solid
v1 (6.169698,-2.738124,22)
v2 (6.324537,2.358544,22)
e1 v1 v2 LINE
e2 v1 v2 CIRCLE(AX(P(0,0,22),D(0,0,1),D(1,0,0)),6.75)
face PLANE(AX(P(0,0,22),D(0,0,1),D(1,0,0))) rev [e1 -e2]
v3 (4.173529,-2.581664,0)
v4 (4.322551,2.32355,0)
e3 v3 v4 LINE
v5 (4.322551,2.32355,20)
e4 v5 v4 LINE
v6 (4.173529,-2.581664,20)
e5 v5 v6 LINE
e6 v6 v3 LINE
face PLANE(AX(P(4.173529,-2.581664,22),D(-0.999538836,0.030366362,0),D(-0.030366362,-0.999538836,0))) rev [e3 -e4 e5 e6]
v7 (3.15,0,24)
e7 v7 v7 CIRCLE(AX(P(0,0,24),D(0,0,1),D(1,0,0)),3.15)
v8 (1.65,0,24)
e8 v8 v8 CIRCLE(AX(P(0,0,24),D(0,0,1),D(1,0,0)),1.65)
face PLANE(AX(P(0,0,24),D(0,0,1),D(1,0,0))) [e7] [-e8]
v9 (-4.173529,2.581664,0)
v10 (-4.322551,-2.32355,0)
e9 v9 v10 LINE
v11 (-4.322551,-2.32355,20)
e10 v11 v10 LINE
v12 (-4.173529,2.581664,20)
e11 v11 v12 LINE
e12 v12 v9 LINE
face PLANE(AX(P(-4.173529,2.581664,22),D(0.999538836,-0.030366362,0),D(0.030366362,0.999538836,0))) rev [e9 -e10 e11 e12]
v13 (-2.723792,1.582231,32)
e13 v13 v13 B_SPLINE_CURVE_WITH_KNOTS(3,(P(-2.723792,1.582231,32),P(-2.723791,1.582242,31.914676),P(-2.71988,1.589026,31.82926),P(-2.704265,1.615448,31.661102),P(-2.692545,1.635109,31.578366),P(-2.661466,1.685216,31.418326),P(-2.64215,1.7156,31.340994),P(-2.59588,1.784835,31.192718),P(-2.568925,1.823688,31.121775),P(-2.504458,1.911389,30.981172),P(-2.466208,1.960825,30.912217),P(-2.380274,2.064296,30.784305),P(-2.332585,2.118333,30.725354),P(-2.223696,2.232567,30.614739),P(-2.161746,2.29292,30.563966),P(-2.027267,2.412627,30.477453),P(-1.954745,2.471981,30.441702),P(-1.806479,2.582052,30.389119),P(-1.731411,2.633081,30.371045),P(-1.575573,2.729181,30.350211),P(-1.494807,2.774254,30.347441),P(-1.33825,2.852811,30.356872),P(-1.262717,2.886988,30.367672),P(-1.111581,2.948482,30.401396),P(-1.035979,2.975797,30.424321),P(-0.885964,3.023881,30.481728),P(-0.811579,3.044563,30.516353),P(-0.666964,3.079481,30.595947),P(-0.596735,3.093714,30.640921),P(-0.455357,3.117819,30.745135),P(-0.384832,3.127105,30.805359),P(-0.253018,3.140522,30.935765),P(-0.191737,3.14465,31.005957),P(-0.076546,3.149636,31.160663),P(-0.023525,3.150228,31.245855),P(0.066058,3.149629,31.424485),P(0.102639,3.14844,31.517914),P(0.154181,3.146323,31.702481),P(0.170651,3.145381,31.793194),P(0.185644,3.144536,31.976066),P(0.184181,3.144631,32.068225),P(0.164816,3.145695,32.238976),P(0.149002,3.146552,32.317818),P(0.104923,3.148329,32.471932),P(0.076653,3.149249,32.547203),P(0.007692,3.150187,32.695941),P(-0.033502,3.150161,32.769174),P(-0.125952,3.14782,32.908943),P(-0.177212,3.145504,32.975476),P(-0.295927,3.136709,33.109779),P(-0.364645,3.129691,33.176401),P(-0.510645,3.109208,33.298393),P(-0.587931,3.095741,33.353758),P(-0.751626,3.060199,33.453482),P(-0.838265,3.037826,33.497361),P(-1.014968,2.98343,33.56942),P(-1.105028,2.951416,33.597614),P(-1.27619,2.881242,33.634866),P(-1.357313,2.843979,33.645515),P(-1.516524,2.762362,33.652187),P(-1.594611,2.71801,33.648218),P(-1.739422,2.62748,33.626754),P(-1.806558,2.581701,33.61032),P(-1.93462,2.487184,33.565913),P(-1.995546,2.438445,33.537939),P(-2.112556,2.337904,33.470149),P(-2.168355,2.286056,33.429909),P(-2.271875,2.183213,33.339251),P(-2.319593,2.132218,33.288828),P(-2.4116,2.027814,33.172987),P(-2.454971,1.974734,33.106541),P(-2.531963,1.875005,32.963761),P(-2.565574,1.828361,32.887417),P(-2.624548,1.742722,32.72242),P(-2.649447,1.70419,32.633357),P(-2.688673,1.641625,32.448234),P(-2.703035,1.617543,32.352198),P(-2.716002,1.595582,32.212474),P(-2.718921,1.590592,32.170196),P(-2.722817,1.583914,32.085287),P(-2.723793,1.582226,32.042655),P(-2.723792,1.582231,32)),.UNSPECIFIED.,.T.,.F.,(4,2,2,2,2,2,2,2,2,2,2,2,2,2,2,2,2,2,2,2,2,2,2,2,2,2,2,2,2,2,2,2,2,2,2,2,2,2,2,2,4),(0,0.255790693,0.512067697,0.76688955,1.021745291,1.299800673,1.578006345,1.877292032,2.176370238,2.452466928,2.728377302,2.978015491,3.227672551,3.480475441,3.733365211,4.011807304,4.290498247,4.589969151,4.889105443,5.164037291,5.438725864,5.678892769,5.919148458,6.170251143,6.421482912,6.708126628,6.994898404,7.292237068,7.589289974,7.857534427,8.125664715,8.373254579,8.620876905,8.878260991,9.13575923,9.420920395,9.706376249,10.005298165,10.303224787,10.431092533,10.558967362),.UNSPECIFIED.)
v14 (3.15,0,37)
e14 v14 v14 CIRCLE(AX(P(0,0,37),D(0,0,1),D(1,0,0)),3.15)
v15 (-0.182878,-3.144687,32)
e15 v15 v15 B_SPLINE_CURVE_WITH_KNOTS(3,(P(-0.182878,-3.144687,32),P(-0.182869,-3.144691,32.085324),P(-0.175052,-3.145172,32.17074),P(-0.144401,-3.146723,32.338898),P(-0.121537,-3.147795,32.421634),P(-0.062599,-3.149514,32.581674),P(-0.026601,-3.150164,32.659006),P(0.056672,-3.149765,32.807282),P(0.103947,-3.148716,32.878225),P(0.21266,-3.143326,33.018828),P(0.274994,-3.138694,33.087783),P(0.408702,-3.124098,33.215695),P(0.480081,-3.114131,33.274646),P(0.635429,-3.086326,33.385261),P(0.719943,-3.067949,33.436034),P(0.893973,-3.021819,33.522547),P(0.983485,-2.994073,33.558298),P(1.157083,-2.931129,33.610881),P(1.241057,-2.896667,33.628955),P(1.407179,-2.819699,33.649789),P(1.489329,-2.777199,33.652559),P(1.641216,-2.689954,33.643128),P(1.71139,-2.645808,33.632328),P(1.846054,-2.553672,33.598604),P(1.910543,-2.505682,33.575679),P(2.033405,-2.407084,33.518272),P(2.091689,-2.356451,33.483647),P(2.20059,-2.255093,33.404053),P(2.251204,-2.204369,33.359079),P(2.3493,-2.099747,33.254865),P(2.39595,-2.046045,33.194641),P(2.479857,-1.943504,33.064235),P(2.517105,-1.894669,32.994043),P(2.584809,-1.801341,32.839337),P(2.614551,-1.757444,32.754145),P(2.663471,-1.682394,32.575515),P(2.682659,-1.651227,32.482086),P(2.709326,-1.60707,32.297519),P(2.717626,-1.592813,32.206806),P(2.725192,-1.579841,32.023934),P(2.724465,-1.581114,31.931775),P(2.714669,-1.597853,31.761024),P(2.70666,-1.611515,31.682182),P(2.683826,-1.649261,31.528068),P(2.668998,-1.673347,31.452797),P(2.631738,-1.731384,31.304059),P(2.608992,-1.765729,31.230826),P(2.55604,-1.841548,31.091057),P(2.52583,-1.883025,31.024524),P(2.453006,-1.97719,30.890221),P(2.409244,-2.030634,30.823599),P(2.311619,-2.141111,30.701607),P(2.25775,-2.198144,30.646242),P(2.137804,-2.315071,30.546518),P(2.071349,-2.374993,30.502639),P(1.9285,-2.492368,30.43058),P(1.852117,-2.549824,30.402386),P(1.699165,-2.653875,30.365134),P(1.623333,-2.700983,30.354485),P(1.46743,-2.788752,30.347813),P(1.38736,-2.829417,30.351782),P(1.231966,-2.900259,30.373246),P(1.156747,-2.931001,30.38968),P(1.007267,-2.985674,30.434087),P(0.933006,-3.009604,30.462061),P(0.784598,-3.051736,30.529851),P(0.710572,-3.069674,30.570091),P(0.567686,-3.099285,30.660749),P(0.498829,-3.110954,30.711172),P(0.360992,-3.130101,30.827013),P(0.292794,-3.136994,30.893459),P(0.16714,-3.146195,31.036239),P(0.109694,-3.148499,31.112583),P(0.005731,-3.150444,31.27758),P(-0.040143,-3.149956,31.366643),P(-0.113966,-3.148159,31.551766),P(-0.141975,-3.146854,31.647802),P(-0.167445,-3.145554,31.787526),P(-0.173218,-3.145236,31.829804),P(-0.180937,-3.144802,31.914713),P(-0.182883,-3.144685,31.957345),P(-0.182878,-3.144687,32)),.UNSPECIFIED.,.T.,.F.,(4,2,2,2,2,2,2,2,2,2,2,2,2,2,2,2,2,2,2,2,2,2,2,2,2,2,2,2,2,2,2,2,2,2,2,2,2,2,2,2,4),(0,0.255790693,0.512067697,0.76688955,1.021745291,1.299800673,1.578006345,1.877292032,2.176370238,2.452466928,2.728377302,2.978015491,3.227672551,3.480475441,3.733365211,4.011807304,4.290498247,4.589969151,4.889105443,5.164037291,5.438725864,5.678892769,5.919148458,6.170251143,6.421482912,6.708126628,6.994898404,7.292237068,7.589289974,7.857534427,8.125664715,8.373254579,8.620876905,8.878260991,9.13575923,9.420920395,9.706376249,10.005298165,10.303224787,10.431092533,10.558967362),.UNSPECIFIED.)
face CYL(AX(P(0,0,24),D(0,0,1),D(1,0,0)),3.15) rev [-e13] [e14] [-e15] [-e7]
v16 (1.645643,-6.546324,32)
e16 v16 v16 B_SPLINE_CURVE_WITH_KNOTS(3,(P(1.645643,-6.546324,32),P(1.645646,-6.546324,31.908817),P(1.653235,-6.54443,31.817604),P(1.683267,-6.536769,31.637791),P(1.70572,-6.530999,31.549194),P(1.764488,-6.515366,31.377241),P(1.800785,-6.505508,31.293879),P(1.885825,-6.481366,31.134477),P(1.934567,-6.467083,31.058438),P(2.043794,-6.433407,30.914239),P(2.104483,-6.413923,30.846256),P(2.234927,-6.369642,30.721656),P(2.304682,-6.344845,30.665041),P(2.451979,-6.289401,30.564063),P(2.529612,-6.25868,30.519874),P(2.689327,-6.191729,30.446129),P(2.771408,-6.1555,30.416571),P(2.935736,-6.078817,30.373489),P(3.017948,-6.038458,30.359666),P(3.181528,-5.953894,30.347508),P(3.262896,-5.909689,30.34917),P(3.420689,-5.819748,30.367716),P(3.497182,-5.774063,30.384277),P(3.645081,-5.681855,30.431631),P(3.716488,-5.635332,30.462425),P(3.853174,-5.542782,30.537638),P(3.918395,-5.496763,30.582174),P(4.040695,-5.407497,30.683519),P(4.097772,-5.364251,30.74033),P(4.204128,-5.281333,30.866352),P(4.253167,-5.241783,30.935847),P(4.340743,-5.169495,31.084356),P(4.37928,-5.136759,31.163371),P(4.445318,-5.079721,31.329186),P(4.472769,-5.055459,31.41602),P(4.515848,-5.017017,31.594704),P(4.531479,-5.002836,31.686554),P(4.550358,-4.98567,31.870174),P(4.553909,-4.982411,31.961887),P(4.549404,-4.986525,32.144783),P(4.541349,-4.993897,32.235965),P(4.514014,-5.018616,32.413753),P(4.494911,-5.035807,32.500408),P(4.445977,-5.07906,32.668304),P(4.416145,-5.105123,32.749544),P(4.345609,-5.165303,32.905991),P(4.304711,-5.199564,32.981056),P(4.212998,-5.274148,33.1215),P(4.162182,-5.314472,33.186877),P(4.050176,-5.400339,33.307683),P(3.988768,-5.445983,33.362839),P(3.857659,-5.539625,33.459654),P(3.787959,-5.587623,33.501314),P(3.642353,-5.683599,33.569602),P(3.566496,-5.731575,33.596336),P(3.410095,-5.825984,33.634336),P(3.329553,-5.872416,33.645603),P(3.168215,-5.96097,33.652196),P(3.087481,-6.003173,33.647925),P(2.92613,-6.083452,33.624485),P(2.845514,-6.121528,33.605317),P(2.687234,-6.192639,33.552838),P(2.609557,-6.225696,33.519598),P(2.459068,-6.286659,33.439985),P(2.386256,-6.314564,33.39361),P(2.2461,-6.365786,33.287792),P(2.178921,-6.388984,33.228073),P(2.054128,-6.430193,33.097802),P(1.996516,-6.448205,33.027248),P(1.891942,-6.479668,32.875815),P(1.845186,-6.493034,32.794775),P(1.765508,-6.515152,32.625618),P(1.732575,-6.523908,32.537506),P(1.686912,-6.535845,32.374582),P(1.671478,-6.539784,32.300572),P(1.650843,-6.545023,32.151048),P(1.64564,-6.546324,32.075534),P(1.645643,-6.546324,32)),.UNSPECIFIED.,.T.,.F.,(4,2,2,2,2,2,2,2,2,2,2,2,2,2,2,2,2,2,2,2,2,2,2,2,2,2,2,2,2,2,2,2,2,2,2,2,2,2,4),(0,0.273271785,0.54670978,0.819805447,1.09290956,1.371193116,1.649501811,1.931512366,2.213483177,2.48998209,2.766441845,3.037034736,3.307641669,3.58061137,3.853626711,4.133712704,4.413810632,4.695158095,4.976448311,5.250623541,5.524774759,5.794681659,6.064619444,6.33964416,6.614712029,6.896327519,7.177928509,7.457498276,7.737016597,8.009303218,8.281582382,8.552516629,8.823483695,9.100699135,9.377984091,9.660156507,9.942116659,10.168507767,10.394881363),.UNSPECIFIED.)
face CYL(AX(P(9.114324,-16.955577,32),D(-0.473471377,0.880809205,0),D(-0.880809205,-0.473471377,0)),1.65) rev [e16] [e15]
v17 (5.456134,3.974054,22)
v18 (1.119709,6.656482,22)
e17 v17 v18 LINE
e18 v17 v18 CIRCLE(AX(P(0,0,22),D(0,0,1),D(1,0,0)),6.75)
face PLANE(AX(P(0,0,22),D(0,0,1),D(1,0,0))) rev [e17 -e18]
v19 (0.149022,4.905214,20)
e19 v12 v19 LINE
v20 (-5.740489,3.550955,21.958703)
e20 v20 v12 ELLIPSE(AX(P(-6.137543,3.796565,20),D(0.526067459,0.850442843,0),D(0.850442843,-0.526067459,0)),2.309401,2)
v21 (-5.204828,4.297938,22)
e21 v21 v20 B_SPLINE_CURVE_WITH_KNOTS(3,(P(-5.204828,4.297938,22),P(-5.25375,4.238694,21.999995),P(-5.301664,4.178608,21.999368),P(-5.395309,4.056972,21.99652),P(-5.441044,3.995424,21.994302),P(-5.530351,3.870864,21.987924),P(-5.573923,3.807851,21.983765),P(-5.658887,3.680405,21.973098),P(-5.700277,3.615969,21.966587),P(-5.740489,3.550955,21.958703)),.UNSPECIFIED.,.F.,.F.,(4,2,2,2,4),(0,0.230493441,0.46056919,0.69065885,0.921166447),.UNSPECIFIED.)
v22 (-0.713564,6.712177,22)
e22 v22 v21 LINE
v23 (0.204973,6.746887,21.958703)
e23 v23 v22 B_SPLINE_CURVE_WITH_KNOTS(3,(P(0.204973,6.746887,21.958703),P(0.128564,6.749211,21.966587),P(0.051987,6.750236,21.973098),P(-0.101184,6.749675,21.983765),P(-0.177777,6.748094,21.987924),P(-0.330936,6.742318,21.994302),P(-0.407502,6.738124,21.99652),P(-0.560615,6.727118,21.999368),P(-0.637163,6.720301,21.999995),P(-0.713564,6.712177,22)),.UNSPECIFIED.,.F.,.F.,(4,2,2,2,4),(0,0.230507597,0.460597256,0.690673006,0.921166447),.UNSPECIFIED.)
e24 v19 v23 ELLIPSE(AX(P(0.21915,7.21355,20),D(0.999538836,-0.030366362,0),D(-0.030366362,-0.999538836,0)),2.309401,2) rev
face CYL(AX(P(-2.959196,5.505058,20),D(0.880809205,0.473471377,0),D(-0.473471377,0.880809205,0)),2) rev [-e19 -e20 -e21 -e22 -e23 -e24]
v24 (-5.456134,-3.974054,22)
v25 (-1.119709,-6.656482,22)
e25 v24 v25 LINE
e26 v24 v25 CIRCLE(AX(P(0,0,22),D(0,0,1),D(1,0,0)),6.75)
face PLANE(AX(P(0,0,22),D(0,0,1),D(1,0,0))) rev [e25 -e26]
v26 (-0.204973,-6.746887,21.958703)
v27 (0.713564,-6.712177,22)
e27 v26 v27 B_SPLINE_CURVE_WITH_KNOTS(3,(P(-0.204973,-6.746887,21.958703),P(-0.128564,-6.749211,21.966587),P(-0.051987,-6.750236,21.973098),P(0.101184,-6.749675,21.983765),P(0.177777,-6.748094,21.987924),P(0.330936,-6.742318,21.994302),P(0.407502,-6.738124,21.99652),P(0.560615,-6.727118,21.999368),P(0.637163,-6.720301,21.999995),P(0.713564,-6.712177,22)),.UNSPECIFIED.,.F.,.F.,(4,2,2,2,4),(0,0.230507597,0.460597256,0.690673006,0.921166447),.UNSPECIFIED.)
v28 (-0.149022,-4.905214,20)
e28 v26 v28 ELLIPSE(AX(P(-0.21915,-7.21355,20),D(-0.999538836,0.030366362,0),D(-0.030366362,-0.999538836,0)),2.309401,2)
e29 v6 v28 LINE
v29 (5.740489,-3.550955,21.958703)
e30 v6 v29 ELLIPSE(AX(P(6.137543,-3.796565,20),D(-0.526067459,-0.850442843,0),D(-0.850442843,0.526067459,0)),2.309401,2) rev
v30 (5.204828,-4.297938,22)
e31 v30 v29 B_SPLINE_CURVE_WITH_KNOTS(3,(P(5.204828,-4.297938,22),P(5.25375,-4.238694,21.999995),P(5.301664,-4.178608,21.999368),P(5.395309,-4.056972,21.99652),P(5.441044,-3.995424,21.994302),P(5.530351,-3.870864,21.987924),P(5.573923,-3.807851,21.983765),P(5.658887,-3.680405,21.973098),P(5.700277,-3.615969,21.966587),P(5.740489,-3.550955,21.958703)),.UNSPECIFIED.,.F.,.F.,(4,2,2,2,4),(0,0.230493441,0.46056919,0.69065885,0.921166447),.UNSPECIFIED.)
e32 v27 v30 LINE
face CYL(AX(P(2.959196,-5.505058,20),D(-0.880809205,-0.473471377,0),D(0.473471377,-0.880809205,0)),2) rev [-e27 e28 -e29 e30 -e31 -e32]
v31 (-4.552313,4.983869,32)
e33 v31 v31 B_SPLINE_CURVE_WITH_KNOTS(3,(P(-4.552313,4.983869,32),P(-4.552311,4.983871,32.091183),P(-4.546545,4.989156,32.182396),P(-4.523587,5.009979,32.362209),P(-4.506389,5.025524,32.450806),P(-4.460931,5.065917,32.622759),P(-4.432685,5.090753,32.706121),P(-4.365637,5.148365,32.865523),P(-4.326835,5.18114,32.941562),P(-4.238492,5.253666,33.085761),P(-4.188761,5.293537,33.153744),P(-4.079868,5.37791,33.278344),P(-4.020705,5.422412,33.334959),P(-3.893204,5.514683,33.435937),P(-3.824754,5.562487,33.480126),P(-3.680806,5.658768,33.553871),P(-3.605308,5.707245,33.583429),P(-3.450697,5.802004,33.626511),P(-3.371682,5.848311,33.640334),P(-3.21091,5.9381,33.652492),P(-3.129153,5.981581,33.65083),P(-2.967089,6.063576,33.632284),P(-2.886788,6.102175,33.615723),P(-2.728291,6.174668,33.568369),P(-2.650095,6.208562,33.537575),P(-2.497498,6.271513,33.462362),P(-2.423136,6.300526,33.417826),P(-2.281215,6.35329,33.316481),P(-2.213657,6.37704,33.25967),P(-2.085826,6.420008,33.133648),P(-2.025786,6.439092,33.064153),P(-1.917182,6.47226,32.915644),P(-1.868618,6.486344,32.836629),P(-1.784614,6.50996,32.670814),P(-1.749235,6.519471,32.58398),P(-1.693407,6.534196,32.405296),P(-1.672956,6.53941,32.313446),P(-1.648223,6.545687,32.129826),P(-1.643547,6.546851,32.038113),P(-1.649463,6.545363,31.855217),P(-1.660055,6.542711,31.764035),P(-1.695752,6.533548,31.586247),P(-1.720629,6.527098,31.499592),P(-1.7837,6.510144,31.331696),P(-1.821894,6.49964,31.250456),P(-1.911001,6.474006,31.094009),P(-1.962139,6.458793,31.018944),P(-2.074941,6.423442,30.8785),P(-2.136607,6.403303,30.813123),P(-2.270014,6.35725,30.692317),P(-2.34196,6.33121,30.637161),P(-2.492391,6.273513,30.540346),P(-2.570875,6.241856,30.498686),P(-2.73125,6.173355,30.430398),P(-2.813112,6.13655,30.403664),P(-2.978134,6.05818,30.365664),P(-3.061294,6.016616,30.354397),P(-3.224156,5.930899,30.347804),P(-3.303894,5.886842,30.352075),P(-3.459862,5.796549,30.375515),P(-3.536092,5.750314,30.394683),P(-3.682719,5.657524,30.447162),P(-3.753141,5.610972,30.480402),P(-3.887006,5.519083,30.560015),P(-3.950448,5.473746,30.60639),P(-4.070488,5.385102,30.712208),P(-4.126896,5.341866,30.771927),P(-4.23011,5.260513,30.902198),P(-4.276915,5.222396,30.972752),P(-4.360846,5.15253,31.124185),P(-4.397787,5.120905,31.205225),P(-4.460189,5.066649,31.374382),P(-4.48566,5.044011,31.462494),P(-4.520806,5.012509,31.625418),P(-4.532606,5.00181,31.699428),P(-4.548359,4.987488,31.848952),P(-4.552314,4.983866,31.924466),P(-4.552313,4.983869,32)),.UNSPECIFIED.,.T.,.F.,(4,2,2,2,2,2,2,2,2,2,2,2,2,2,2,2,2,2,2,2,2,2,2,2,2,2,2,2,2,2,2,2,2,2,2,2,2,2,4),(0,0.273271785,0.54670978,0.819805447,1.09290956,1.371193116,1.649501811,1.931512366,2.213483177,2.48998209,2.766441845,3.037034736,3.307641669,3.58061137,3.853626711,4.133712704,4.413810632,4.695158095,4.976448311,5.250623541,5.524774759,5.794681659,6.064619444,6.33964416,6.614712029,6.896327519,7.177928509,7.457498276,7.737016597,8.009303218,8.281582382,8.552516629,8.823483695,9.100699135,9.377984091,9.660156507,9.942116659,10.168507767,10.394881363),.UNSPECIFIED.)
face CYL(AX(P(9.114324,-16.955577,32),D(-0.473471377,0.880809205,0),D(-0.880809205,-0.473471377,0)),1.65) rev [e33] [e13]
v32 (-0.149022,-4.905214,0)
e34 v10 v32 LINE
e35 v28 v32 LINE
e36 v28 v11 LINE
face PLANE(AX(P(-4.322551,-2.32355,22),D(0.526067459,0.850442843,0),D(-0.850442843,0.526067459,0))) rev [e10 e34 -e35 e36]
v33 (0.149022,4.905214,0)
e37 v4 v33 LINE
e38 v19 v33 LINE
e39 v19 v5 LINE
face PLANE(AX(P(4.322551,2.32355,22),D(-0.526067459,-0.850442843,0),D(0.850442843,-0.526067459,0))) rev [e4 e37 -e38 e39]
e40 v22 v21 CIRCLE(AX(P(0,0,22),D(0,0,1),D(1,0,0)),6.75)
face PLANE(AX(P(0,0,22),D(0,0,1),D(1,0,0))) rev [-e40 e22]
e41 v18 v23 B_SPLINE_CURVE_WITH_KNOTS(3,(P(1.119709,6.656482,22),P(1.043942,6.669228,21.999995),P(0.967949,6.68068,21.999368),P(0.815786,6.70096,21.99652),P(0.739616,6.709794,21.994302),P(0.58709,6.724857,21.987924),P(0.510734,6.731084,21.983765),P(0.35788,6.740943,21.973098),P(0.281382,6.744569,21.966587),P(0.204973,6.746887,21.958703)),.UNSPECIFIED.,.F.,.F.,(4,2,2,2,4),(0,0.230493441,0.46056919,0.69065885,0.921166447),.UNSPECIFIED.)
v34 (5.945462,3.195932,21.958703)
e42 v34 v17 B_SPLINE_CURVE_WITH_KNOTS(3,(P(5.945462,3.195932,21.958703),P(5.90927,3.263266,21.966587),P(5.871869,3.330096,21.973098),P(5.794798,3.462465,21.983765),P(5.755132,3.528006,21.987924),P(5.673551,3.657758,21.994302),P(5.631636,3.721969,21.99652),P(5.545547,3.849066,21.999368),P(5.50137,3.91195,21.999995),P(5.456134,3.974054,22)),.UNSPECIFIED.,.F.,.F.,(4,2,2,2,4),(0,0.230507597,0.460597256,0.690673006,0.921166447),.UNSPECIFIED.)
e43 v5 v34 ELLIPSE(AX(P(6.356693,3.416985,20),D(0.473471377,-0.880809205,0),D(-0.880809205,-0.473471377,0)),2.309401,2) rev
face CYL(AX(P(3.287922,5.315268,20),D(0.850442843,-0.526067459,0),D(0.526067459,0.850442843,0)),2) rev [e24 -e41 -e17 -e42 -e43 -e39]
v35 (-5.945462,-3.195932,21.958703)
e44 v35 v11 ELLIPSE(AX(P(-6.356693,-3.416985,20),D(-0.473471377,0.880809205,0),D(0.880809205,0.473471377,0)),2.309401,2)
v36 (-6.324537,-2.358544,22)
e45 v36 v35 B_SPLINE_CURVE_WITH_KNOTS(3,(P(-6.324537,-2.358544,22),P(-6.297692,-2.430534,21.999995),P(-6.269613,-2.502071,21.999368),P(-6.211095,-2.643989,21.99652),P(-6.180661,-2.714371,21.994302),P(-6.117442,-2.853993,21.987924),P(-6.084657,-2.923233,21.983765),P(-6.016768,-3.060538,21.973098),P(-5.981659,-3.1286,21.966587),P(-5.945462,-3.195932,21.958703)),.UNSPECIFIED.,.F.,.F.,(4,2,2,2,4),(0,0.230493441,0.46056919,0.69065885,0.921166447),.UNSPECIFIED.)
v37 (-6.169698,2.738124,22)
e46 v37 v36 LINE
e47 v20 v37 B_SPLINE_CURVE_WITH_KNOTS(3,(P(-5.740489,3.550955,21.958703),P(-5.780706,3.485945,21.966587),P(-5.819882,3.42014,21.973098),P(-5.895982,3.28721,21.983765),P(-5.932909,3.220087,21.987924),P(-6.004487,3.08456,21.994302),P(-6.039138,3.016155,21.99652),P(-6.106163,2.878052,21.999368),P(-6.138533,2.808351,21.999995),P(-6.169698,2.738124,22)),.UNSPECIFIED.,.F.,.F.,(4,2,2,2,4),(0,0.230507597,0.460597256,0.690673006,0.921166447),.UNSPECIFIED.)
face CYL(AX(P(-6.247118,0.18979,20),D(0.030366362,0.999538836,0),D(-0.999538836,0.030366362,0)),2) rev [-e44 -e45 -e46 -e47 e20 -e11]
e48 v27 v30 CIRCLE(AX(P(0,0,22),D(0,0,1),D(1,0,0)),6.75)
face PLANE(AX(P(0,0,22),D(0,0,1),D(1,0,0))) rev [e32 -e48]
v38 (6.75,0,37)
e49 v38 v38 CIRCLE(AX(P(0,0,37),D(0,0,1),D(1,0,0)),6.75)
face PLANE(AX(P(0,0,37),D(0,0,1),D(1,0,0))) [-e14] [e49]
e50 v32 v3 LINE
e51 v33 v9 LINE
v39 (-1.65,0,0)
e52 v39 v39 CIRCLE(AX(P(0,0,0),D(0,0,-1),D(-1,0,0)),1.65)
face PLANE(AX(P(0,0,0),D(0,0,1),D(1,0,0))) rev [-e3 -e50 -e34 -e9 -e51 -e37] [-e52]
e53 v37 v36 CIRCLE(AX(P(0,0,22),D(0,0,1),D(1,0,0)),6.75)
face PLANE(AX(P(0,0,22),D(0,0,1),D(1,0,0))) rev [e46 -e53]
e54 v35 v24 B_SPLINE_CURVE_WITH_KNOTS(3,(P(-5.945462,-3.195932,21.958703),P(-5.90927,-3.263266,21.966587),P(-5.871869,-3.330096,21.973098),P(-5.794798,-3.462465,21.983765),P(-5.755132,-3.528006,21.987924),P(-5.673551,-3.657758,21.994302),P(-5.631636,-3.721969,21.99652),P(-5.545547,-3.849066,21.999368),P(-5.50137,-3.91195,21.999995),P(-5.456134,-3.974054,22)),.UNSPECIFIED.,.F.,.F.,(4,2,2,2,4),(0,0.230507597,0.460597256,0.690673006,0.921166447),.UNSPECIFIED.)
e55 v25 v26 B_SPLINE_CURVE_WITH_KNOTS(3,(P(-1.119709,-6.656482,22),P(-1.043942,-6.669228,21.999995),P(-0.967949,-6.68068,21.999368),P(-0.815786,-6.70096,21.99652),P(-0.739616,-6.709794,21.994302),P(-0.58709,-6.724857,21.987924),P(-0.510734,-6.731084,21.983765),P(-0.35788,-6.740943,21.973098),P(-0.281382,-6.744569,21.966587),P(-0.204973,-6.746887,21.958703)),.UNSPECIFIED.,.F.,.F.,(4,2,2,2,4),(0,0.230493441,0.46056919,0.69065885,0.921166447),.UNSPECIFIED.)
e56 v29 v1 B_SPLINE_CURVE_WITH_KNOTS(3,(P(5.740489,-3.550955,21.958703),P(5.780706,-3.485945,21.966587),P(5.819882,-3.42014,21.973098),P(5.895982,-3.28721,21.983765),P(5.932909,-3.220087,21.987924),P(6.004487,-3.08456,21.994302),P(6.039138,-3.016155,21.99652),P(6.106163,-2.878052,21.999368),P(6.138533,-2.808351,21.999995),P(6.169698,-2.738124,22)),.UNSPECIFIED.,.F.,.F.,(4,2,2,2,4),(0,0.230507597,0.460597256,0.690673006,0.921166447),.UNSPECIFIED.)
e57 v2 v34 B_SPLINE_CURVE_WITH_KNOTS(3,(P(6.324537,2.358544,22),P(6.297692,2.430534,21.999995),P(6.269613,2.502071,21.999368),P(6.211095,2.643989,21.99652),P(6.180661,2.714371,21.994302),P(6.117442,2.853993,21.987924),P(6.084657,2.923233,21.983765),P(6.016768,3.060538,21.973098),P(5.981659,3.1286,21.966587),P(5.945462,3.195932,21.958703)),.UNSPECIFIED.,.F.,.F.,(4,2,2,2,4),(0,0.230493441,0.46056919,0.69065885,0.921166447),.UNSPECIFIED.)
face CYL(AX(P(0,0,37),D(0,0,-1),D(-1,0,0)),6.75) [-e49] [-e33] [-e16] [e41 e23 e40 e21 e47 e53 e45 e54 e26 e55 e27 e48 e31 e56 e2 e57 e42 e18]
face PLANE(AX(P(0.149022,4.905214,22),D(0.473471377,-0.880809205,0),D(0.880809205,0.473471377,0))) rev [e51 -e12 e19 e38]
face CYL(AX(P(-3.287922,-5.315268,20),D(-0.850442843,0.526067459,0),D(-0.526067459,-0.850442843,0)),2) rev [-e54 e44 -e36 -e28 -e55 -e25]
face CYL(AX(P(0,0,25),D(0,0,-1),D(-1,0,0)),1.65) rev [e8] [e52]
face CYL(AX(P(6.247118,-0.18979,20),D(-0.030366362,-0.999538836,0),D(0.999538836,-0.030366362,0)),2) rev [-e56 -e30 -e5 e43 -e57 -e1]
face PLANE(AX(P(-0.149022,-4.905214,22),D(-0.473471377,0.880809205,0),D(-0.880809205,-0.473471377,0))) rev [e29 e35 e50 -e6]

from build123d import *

# Parameters (mm, degrees)
BOSS_EXTRUDE1_DEPTH     = 22
SKETCH2_R               = 6.75
BOSS_EXTRUDE2_DEPTH     = 15
SKETCH3_R               = 3.15
CUT_EXTRUDE1_DEPTH      = 13
FILLET2_R               = 2
CUT_EXTRUDE2_DEPTH      = 15
CUT_EXTRUDE2_DEPTH_BACK = 15
SKETCH8_R               = 1.65
SKETCH9_R               = 1.65
CUT_EXTRUDE3_DEPTH      = 25


with BuildPart() as part:
    # Sketch1 → Boss-Extrude1 (new body)
    with BuildSketch(Plane.XY):
        Polygon((4.322551167, 2.323550029), (0.149022231, 4.905214135), (-4.173528936, 2.581664105), (-4.322551167, -2.323550029), (-0.149022231, -4.905214135), (4.173528936, -2.581664105), align=None)
    extrude(amount=BOSS_EXTRUDE1_DEPTH)

    # Sketch2 → Boss-Extrude2 (add)
    with BuildSketch(Plane.XY.offset(22)):
        Circle(SKETCH2_R)
    extrude(amount=BOSS_EXTRUDE2_DEPTH)

    # Sketch3 → Cut-Extrude1 (cut)
    with BuildSketch(Plane.XY.offset(37)):
        Circle(SKETCH3_R)
    extrude(amount=-CUT_EXTRUDE1_DEPTH, mode=Mode.SUBTRACT)

    # Fillet2
    # the kernel refuses this fillet: 2 mm, written as the material it adds along each edge
    with BuildSketch(Plane(origin=(-4.021697127, 7.579358284, 22), x_dir=(-0.9995388356967246, 0.03036636188344198, 0), z_dir=(-0.03036636188344198, -0.9995388356967246, 0))) as fillet2_piece_1_section:
        with BuildLine():
            CenterArc((FILLET2_R, FILLET2_R), FILLET2_R, 180, 90)
            Line((0, FILLET2_R), (0, 0))
            Line((0, 0), (FILLET2_R, 0))
        make_face()
    fillet2_piece_1 = extrude(amount=14.907477288, mode=Mode.PRIVATE)
    fillet2_piece_1 = split(fillet2_piece_1, bisect_by=Plane(origin=(-5.562210671, 1.835190238, 21.518286734), z_dir=(0.47347137703679, -0.8808092047242047, 0)), keep=Keep.TOP, mode=Mode.PRIVATE)
    fillet2_piece_1 = split(fillet2_piece_1, bisect_by=Plane(origin=(-5.663357367, -1.494153303, 21.518286734), z_dir=(0.5260674586599345, 0.8504428428407627, 0)), keep=Keep.TOP, mode=Mode.PRIVATE)
    add(fillet2_piece_1)
    with BuildSketch(Plane(origin=(-8.574765382, 0.306787264, 22), x_dir=(-0.5260674586599345, -0.8504428428407627, 0), z_dir=(0.8504428428407627, -0.5260674586599345, 0))) as fillet2_piece_2_section:
        with BuildLine():
            CenterArc((FILLET2_R, FILLET2_R), FILLET2_R, 180, 90)
            Line((0, FILLET2_R), (0, 0))
            Line((0, 0), (FILLET2_R, 0))
        make_face()
    fillet2_piece_2 = extrude(amount=14.907477288, mode=Mode.PRIVATE)
    fillet2_piece_2 = split(fillet2_piece_2, bisect_by=Plane(origin=(-4.370426703, -3.899420623, 21.518286734), z_dir=(0.9995388356967246, -0.03036636188344198, 0)), keep=Keep.TOP, mode=Mode.PRIVATE)
    fillet2_piece_2 = split(fillet2_piece_2, bisect_by=Plane(origin=(-1.537703966, -5.651688002, 21.518286734), z_dir=(-0.47347137703679004, 0.8808092047242047, 0)), keep=Keep.TOP, mode=Mode.PRIVATE)
    add(fillet2_piece_2)
    with BuildSketch(Plane(origin=(-4.553068255, -7.27257102, 22), x_dir=(0.4734713770367901, -0.8808092047242048, 0), z_dir=(0.8808092047242047, 0.47347137703679004, 0))) as fillet2_piece_3_section:
        with BuildLine():
            CenterArc((FILLET2_R, FILLET2_R), FILLET2_R, 180, 90)
            Line((0, FILLET2_R), (0, 0))
            Line((0, 0), (FILLET2_R, 0))
        make_face()
    fillet2_piece_3 = extrude(amount=14.907477288, mode=Mode.PRIVATE)
    fillet2_piece_3 = split(fillet2_piece_3, bisect_by=Plane(origin=(1.191783968, -5.734610861, 21.518286734), z_dir=(0.5260674586599345, 0.8504428428407627, 0)), keep=Keep.TOP, mode=Mode.PRIVATE)
    fillet2_piece_3 = split(fillet2_piece_3, bisect_by=Plane(origin=(4.125653401, -4.157534699, 21.518286734), z_dir=(-0.9995388356967246, 0.03036636188344197, 0)), keep=Keep.TOP, mode=Mode.PRIVATE)
    add(fillet2_piece_3)
    with BuildSketch(Plane(origin=(4.021697127, -7.579358284, 22), x_dir=(0.9995388356967246, -0.03036636188344197, 0), z_dir=(0.03036636188344197, 0.9995388356967246, 0))) as fillet2_piece_4_section:
        with BuildLine():
            CenterArc((FILLET2_R, FILLET2_R), FILLET2_R, 180, 90)
            Line((0, FILLET2_R), (0, 0))
            Line((0, 0), (FILLET2_R, 0))
        make_face()
    fillet2_piece_4 = extrude(amount=14.907477288, mode=Mode.PRIVATE)
    fillet2_piece_4 = split(fillet2_piece_4, bisect_by=Plane(origin=(5.663357367, 1.494153303, 21.518286734), z_dir=(-0.5260674586599344, -0.8504428428407627, 0)), keep=Keep.TOP, mode=Mode.PRIVATE)
    fillet2_piece_4 = split(fillet2_piece_4, bisect_by=Plane(origin=(5.562210671, -1.835190238, 21.518286734), z_dir=(-0.47347137703679004, 0.8808092047242047, 0)), keep=Keep.TOP, mode=Mode.PRIVATE)
    add(fillet2_piece_4)
    with BuildSketch(Plane(origin=(8.574765382, -0.306787264, 22), x_dir=(0.5260674586599344, 0.8504428428407628, 0), z_dir=(-0.8504428428407627, 0.5260674586599344, 0))) as fillet2_piece_5_section:
        with BuildLine():
            CenterArc((FILLET2_R, FILLET2_R), FILLET2_R, 180, 90)
            Line((0, FILLET2_R), (0, 0))
            Line((0, 0), (FILLET2_R, 0))
        make_face()
    fillet2_piece_5 = extrude(amount=14.907477288, mode=Mode.PRIVATE)
    fillet2_piece_5 = split(fillet2_piece_5, bisect_by=Plane(origin=(4.370426703, 3.899420623, 21.518286734), z_dir=(-0.9995388356967246, 0.03036636188344197, 0)), keep=Keep.TOP, mode=Mode.PRIVATE)
    fillet2_piece_5 = split(fillet2_piece_5, bisect_by=Plane(origin=(1.537703966, 5.651688002, 21.518286734), z_dir=(0.47347137703679, -0.8808092047242047, 0)), keep=Keep.TOP, mode=Mode.PRIVATE)
    add(fillet2_piece_5)
    with BuildSketch(Plane(origin=(4.553068255, 7.27257102, 22), x_dir=(-0.47347137703678993, 0.8808092047242047, 0), z_dir=(-0.8808092047242047, -0.47347137703679, 0))) as fillet2_piece_6_section:
        with BuildLine():
            CenterArc((FILLET2_R, FILLET2_R), FILLET2_R, 180, 90)
            Line((0, FILLET2_R), (0, 0))
            Line((0, 0), (FILLET2_R, 0))
        make_face()
    fillet2_piece_6 = extrude(amount=14.907477288, mode=Mode.PRIVATE)
    fillet2_piece_6 = split(fillet2_piece_6, bisect_by=Plane(origin=(-1.191783968, 5.734610861, 21.518286734), z_dir=(-0.5260674586599344, -0.8504428428407627, 0)), keep=Keep.TOP, mode=Mode.PRIVATE)
    fillet2_piece_6 = split(fillet2_piece_6, bisect_by=Plane(origin=(-4.125653401, 4.157534699, 21.518286734), z_dir=(0.9995388356967246, -0.03036636188344198, 0)), keep=Keep.TOP, mode=Mode.PRIVATE)
    add(fillet2_piece_6)
    with BuildSketch(Plane(origin=(4.553068255, 7.27257102, 22), x_dir=(-0.47347137703678993, 0.8808092047242047, 0), z_dir=(-0.8808092047242047, -0.47347137703679, 0))) as fillet2_piece_7a_section:
        with BuildLine():
            CenterArc((FILLET2_R, FILLET2_R), FILLET2_R, 180, 90)
            Line((0, FILLET2_R), (0, 0))
            Line((0, 0), (FILLET2_R, 0))
        make_face()
    fillet2_piece_7a = extrude(amount=14.907477288, mode=Mode.PRIVATE)
    fillet2_piece_7a = fillet2_piece_7a & Plane(origin=(0, 0, 21.52699727), x_dir=(1, 0, 0), z_dir=(0, 0, -1)) * Cylinder(6.75, 38, mode=Mode.PRIVATE)
    fillet2_piece_7a = split(fillet2_piece_7a, bisect_by=Plane(origin=(-4.178945421, 2.403375135, 21.52699727), z_dir=(-0.9995388356967246, 0.03036636188344198, 0)), keep=Keep.TOP, mode=Mode.PRIVATE)
    with BuildSketch(Plane(origin=(-4.021697127, 7.579358284, 22), x_dir=(-0.9995388356967246, 0.03036636188344198, 0), z_dir=(-0.03036636188344198, -0.9995388356967246, 0))) as fillet2_piece_7b_section:
        with BuildLine():
            CenterArc((FILLET2_R, FILLET2_R), FILLET2_R, 180, 90)
            Line((0, FILLET2_R), (0, 0))
            Line((0, 0), (FILLET2_R, 0))
        make_face()
    fillet2_piece_7b = extrude(amount=14.907477288, mode=Mode.PRIVATE)
    fillet2_piece_7b = fillet2_piece_7b & Plane(origin=(0, 0, 21.526998099), x_dir=(1, 0, 0), z_dir=(0, 0, -1)) * Cylinder(6.75, 38, mode=Mode.PRIVATE)
    fillet2_piece_7b = split(fillet2_piece_7b, bisect_by=Plane(origin=(-4.016417327, 2.666118093, 21.526998099), z_dir=(-0.47347137703679, 0.8808092047242047, 0)), keep=Keep.TOP, mode=Mode.PRIVATE)
    fillet2_piece_7 = fillet2_piece_7a & fillet2_piece_7b
    add(fillet2_piece_7)
    with BuildSketch(Plane(origin=(-4.021697127, 7.579358284, 22), x_dir=(-0.9995388356967246, 0.03036636188344198, 0), z_dir=(-0.03036636188344198, -0.9995388356967246, 0))) as fillet2_piece_8a_section:
        with BuildLine():
            CenterArc((FILLET2_R, FILLET2_R), FILLET2_R, 180, 90)
            Line((0, FILLET2_R), (0, 0))
            Line((0, 0), (FILLET2_R, 0))
        make_face()
    fillet2_piece_8a = extrude(amount=14.907477288, mode=Mode.PRIVATE)
    fillet2_piece_8a = fillet2_piece_8a & Plane(origin=(0, 0, 21.52699727), x_dir=(1, 0, 0), z_dir=(0, 0, -1)) * Cylinder(6.75, 38, mode=Mode.PRIVATE)
    fillet2_piece_8a = split(fillet2_piece_8a, bisect_by=Plane(origin=(-4.170856632, -2.417385329, 21.52699727), z_dir=(-0.5260674586599345, -0.8504428428407627, 0)), keep=Keep.TOP, mode=Mode.PRIVATE)
    with BuildSketch(Plane(origin=(-8.574765382, 0.306787264, 22), x_dir=(-0.5260674586599345, -0.8504428428407627, 0), z_dir=(0.8504428428407627, -0.5260674586599345, 0))) as fillet2_piece_8b_section:
        with BuildLine():
            CenterArc((FILLET2_R, FILLET2_R), FILLET2_R, 180, 90)
            Line((0, FILLET2_R), (0, 0))
            Line((0, 0), (FILLET2_R, 0))
        make_face()
    fillet2_piece_8b = extrude(amount=14.907477288, mode=Mode.PRIVATE)
    fillet2_piece_8b = fillet2_piece_8b & Plane(origin=(0, 0, 21.526998099), x_dir=(1, 0, 0), z_dir=(0, 0, -1)) * Cylinder(6.75, 38, mode=Mode.PRIVATE)
    fillet2_piece_8b = split(fillet2_piece_8b, bisect_by=Plane(origin=(-4.317134662, -2.145260391, 21.526998099), z_dir=(-0.9995388356967246, 0.03036636188344198, 0)), keep=Keep.TOP, mode=Mode.PRIVATE)
    fillet2_piece_8 = fillet2_piece_8a & fillet2_piece_8b
    add(fillet2_piece_8)
    with BuildSketch(Plane(origin=(-8.574765382, 0.306787264, 22), x_dir=(-0.5260674586599345, -0.8504428428407627, 0), z_dir=(0.8504428428407627, -0.5260674586599345, 0))) as fillet2_piece_9a_section:
        with BuildLine():
            CenterArc((FILLET2_R, FILLET2_R), FILLET2_R, 180, 90)
            Line((0, FILLET2_R), (0, 0))
            Line((0, 0), (FILLET2_R, 0))
        make_face()
    fillet2_piece_9a = extrude(amount=14.907477288, mode=Mode.PRIVATE)
    fillet2_piece_9a = fillet2_piece_9a & Plane(origin=(0, 0, 21.52699727), x_dir=(1, 0, 0), z_dir=(0, 0, -1)) * Cylinder(6.75, 38, mode=Mode.PRIVATE)
    fillet2_piece_9a = split(fillet2_piece_9a, bisect_by=Plane(origin=(0.008088789, -4.820760463, 21.52699727), z_dir=(0.47347137703679004, -0.8808092047242047, 0)), keep=Keep.TOP, mode=Mode.PRIVATE)
    with BuildSketch(Plane(origin=(-4.553068255, -7.27257102, 22), x_dir=(0.4734713770367901, -0.8808092047242048, 0), z_dir=(0.8808092047242047, 0.47347137703679004, 0))) as fillet2_piece_9b_section:
        with BuildLine():
            CenterArc((FILLET2_R, FILLET2_R), FILLET2_R, 180, 90)
            Line((0, FILLET2_R), (0, 0))
            Line((0, 0), (FILLET2_R, 0))
        make_face()
    fillet2_piece_9b = extrude(amount=14.907477288, mode=Mode.PRIVATE)
    fillet2_piece_9b = fillet2_piece_9b & Plane(origin=(0, 0, 21.526998099), x_dir=(1, 0, 0), z_dir=(0, 0, -1)) * Cylinder(6.75, 38, mode=Mode.PRIVATE)
    fillet2_piece_9b = split(fillet2_piece_9b, bisect_by=Plane(origin=(-0.300717335, -4.811378484, 21.526998099), z_dir=(-0.5260674586599345, -0.8504428428407627, 0)), keep=Keep.TOP, mode=Mode.PRIVATE)
    fillet2_piece_9 = fillet2_piece_9a & fillet2_piece_9b
    add(fillet2_piece_9)
    with BuildSketch(Plane(origin=(-4.553068255, -7.27257102, 22), x_dir=(0.4734713770367901, -0.8808092047242048, 0), z_dir=(0.8808092047242047, 0.47347137703679004, 0))) as fillet2_piece_10a_section:
        with BuildLine():
            CenterArc((FILLET2_R, FILLET2_R), FILLET2_R, 180, 90)
            Line((0, FILLET2_R), (0, 0))
            Line((0, 0), (FILLET2_R, 0))
        make_face()
    fillet2_piece_10a = extrude(amount=14.907477288, mode=Mode.PRIVATE)
    fillet2_piece_10a = fillet2_piece_10a & Plane(origin=(0, 0, 21.52699727), x_dir=(1, 0, 0), z_dir=(0, 0, -1)) * Cylinder(6.75, 38, mode=Mode.PRIVATE)
    fillet2_piece_10a = split(fillet2_piece_10a, bisect_by=Plane(origin=(4.178945421, -2.403375135, 21.52699727), z_dir=(0.9995388356967246, -0.03036636188344197, 0)), keep=Keep.TOP, mode=Mode.PRIVATE)
    with BuildSketch(Plane(origin=(4.021697127, -7.579358284, 22), x_dir=(0.9995388356967246, -0.03036636188344197, 0), z_dir=(0.03036636188344197, 0.9995388356967246, 0))) as fillet2_piece_10b_section:
        with BuildLine():
            CenterArc((FILLET2_R, FILLET2_R), FILLET2_R, 180, 90)
            Line((0, FILLET2_R), (0, 0))
            Line((0, 0), (FILLET2_R, 0))
        make_face()
    fillet2_piece_10b = extrude(amount=14.907477288, mode=Mode.PRIVATE)
    fillet2_piece_10b = fillet2_piece_10b & Plane(origin=(0, 0, 21.526998099), x_dir=(1, 0, 0), z_dir=(0, 0, -1)) * Cylinder(6.75, 38, mode=Mode.PRIVATE)
    fillet2_piece_10b = split(fillet2_piece_10b, bisect_by=Plane(origin=(4.016417327, -2.666118093, 21.526998099), z_dir=(0.47347137703679004, -0.8808092047242047, 0)), keep=Keep.TOP, mode=Mode.PRIVATE)
    fillet2_piece_10 = fillet2_piece_10a & fillet2_piece_10b
    add(fillet2_piece_10)
    with BuildSketch(Plane(origin=(8.574765382, -0.306787264, 22), x_dir=(0.5260674586599344, 0.8504428428407628, 0), z_dir=(-0.8504428428407627, 0.5260674586599344, 0))) as fillet2_piece_11a_section:
        with BuildLine():
            CenterArc((FILLET2_R, FILLET2_R), FILLET2_R, 180, 90)
            Line((0, FILLET2_R), (0, 0))
            Line((0, 0), (FILLET2_R, 0))
        make_face()
    fillet2_piece_11a = extrude(amount=14.907477288, mode=Mode.PRIVATE)
    fillet2_piece_11a = fillet2_piece_11a & Plane(origin=(0, 0, 21.526998099), x_dir=(1, 0, 0), z_dir=(0, 0, -1)) * Cylinder(6.75, 38, mode=Mode.PRIVATE)
    fillet2_piece_11a = split(fillet2_piece_11a, bisect_by=Plane(origin=(4.317134662, 2.145260391, 21.526998099), z_dir=(0.9995388356967246, -0.03036636188344197, 0)), keep=Keep.TOP, mode=Mode.PRIVATE)
    with BuildSketch(Plane(origin=(4.021697127, -7.579358284, 22), x_dir=(0.9995388356967246, -0.03036636188344197, 0), z_dir=(0.03036636188344197, 0.9995388356967246, 0))) as fillet2_piece_11b_section:
        with BuildLine():
            CenterArc((FILLET2_R, FILLET2_R), FILLET2_R, 180, 90)
            Line((0, FILLET2_R), (0, 0))
            Line((0, 0), (FILLET2_R, 0))
        make_face()
    fillet2_piece_11b = extrude(amount=14.907477288, mode=Mode.PRIVATE)
    fillet2_piece_11b = fillet2_piece_11b & Plane(origin=(0, 0, 21.52699727), x_dir=(1, 0, 0), z_dir=(0, 0, -1)) * Cylinder(6.75, 38, mode=Mode.PRIVATE)
    fillet2_piece_11b = split(fillet2_piece_11b, bisect_by=Plane(origin=(4.170856632, 2.417385329, 21.52699727), z_dir=(0.5260674586599344, 0.8504428428407627, 0)), keep=Keep.TOP, mode=Mode.PRIVATE)
    fillet2_piece_11 = fillet2_piece_11a & fillet2_piece_11b
    add(fillet2_piece_11)
    with BuildSketch(Plane(origin=(8.574765382, -0.306787264, 22), x_dir=(0.5260674586599344, 0.8504428428407628, 0), z_dir=(-0.8504428428407627, 0.5260674586599344, 0))) as fillet2_piece_12a_section:
        with BuildLine():
            CenterArc((FILLET2_R, FILLET2_R), FILLET2_R, 180, 90)
            Line((0, FILLET2_R), (0, 0))
            Line((0, 0), (FILLET2_R, 0))
        make_face()
    fillet2_piece_12a = extrude(amount=14.907477288, mode=Mode.PRIVATE)
    fillet2_piece_12a = fillet2_piece_12a & Plane(origin=(0, 0, 21.52699727), x_dir=(1, 0, 0), z_dir=(0, 0, -1)) * Cylinder(6.75, 38, mode=Mode.PRIVATE)
    fillet2_piece_12a = split(fillet2_piece_12a, bisect_by=Plane(origin=(-0.008088789, 4.820760463, 21.52699727), z_dir=(-0.47347137703679, 0.8808092047242047, 0)), keep=Keep.TOP, mode=Mode.PRIVATE)
    with BuildSketch(Plane(origin=(4.553068255, 7.27257102, 22), x_dir=(-0.47347137703678993, 0.8808092047242047, 0), z_dir=(-0.8808092047242047, -0.47347137703679, 0))) as fillet2_piece_12b_section:
        with BuildLine():
            CenterArc((FILLET2_R, FILLET2_R), FILLET2_R, 180, 90)
            Line((0, FILLET2_R), (0, 0))
            Line((0, 0), (FILLET2_R, 0))
        make_face()
    fillet2_piece_12b = extrude(amount=14.907477288, mode=Mode.PRIVATE)
    fillet2_piece_12b = fillet2_piece_12b & Plane(origin=(0, 0, 21.526998099), x_dir=(1, 0, 0), z_dir=(0, 0, -1)) * Cylinder(6.75, 38, mode=Mode.PRIVATE)
    fillet2_piece_12b = split(fillet2_piece_12b, bisect_by=Plane(origin=(0.300717335, 4.811378484, 21.526998099), z_dir=(0.5260674586599344, 0.8504428428407627, 0)), keep=Keep.TOP, mode=Mode.PRIVATE)
    fillet2_piece_12 = fillet2_piece_12a & fillet2_piece_12b
    add(fillet2_piece_12)

    # Sketch8 → Cut-Extrude2 (cut, two sides: drawn at the far end of the back side and taken through both)
    with BuildSketch(Plane(origin=(2.012253352, -3.74343912, 0), x_dir=(-0.8808092047242045, -0.4734713770367903, 0), z_dir=(0.4734713770367903, -0.8808092047242045, 0)).offset(-CUT_EXTRUDE2_DEPTH_BACK)):
        with Locations((0, -32)):
            Circle(SKETCH8_R)
    extrude(amount=CUT_EXTRUDE2_DEPTH + CUT_EXTRUDE2_DEPTH_BACK, mode=Mode.SUBTRACT)

    # Sketch9 → Cut-Extrude3 (cut)
    with BuildSketch(Plane(origin=(0, 0, 0), x_dir=(-1, 0, 0), z_dir=(0, 0, -1))):
        Circle(SKETCH9_R)
    extrude(amount=-CUT_EXTRUDE3_DEPTH, mode=Mode.SUBTRACT)


solid = part.part
